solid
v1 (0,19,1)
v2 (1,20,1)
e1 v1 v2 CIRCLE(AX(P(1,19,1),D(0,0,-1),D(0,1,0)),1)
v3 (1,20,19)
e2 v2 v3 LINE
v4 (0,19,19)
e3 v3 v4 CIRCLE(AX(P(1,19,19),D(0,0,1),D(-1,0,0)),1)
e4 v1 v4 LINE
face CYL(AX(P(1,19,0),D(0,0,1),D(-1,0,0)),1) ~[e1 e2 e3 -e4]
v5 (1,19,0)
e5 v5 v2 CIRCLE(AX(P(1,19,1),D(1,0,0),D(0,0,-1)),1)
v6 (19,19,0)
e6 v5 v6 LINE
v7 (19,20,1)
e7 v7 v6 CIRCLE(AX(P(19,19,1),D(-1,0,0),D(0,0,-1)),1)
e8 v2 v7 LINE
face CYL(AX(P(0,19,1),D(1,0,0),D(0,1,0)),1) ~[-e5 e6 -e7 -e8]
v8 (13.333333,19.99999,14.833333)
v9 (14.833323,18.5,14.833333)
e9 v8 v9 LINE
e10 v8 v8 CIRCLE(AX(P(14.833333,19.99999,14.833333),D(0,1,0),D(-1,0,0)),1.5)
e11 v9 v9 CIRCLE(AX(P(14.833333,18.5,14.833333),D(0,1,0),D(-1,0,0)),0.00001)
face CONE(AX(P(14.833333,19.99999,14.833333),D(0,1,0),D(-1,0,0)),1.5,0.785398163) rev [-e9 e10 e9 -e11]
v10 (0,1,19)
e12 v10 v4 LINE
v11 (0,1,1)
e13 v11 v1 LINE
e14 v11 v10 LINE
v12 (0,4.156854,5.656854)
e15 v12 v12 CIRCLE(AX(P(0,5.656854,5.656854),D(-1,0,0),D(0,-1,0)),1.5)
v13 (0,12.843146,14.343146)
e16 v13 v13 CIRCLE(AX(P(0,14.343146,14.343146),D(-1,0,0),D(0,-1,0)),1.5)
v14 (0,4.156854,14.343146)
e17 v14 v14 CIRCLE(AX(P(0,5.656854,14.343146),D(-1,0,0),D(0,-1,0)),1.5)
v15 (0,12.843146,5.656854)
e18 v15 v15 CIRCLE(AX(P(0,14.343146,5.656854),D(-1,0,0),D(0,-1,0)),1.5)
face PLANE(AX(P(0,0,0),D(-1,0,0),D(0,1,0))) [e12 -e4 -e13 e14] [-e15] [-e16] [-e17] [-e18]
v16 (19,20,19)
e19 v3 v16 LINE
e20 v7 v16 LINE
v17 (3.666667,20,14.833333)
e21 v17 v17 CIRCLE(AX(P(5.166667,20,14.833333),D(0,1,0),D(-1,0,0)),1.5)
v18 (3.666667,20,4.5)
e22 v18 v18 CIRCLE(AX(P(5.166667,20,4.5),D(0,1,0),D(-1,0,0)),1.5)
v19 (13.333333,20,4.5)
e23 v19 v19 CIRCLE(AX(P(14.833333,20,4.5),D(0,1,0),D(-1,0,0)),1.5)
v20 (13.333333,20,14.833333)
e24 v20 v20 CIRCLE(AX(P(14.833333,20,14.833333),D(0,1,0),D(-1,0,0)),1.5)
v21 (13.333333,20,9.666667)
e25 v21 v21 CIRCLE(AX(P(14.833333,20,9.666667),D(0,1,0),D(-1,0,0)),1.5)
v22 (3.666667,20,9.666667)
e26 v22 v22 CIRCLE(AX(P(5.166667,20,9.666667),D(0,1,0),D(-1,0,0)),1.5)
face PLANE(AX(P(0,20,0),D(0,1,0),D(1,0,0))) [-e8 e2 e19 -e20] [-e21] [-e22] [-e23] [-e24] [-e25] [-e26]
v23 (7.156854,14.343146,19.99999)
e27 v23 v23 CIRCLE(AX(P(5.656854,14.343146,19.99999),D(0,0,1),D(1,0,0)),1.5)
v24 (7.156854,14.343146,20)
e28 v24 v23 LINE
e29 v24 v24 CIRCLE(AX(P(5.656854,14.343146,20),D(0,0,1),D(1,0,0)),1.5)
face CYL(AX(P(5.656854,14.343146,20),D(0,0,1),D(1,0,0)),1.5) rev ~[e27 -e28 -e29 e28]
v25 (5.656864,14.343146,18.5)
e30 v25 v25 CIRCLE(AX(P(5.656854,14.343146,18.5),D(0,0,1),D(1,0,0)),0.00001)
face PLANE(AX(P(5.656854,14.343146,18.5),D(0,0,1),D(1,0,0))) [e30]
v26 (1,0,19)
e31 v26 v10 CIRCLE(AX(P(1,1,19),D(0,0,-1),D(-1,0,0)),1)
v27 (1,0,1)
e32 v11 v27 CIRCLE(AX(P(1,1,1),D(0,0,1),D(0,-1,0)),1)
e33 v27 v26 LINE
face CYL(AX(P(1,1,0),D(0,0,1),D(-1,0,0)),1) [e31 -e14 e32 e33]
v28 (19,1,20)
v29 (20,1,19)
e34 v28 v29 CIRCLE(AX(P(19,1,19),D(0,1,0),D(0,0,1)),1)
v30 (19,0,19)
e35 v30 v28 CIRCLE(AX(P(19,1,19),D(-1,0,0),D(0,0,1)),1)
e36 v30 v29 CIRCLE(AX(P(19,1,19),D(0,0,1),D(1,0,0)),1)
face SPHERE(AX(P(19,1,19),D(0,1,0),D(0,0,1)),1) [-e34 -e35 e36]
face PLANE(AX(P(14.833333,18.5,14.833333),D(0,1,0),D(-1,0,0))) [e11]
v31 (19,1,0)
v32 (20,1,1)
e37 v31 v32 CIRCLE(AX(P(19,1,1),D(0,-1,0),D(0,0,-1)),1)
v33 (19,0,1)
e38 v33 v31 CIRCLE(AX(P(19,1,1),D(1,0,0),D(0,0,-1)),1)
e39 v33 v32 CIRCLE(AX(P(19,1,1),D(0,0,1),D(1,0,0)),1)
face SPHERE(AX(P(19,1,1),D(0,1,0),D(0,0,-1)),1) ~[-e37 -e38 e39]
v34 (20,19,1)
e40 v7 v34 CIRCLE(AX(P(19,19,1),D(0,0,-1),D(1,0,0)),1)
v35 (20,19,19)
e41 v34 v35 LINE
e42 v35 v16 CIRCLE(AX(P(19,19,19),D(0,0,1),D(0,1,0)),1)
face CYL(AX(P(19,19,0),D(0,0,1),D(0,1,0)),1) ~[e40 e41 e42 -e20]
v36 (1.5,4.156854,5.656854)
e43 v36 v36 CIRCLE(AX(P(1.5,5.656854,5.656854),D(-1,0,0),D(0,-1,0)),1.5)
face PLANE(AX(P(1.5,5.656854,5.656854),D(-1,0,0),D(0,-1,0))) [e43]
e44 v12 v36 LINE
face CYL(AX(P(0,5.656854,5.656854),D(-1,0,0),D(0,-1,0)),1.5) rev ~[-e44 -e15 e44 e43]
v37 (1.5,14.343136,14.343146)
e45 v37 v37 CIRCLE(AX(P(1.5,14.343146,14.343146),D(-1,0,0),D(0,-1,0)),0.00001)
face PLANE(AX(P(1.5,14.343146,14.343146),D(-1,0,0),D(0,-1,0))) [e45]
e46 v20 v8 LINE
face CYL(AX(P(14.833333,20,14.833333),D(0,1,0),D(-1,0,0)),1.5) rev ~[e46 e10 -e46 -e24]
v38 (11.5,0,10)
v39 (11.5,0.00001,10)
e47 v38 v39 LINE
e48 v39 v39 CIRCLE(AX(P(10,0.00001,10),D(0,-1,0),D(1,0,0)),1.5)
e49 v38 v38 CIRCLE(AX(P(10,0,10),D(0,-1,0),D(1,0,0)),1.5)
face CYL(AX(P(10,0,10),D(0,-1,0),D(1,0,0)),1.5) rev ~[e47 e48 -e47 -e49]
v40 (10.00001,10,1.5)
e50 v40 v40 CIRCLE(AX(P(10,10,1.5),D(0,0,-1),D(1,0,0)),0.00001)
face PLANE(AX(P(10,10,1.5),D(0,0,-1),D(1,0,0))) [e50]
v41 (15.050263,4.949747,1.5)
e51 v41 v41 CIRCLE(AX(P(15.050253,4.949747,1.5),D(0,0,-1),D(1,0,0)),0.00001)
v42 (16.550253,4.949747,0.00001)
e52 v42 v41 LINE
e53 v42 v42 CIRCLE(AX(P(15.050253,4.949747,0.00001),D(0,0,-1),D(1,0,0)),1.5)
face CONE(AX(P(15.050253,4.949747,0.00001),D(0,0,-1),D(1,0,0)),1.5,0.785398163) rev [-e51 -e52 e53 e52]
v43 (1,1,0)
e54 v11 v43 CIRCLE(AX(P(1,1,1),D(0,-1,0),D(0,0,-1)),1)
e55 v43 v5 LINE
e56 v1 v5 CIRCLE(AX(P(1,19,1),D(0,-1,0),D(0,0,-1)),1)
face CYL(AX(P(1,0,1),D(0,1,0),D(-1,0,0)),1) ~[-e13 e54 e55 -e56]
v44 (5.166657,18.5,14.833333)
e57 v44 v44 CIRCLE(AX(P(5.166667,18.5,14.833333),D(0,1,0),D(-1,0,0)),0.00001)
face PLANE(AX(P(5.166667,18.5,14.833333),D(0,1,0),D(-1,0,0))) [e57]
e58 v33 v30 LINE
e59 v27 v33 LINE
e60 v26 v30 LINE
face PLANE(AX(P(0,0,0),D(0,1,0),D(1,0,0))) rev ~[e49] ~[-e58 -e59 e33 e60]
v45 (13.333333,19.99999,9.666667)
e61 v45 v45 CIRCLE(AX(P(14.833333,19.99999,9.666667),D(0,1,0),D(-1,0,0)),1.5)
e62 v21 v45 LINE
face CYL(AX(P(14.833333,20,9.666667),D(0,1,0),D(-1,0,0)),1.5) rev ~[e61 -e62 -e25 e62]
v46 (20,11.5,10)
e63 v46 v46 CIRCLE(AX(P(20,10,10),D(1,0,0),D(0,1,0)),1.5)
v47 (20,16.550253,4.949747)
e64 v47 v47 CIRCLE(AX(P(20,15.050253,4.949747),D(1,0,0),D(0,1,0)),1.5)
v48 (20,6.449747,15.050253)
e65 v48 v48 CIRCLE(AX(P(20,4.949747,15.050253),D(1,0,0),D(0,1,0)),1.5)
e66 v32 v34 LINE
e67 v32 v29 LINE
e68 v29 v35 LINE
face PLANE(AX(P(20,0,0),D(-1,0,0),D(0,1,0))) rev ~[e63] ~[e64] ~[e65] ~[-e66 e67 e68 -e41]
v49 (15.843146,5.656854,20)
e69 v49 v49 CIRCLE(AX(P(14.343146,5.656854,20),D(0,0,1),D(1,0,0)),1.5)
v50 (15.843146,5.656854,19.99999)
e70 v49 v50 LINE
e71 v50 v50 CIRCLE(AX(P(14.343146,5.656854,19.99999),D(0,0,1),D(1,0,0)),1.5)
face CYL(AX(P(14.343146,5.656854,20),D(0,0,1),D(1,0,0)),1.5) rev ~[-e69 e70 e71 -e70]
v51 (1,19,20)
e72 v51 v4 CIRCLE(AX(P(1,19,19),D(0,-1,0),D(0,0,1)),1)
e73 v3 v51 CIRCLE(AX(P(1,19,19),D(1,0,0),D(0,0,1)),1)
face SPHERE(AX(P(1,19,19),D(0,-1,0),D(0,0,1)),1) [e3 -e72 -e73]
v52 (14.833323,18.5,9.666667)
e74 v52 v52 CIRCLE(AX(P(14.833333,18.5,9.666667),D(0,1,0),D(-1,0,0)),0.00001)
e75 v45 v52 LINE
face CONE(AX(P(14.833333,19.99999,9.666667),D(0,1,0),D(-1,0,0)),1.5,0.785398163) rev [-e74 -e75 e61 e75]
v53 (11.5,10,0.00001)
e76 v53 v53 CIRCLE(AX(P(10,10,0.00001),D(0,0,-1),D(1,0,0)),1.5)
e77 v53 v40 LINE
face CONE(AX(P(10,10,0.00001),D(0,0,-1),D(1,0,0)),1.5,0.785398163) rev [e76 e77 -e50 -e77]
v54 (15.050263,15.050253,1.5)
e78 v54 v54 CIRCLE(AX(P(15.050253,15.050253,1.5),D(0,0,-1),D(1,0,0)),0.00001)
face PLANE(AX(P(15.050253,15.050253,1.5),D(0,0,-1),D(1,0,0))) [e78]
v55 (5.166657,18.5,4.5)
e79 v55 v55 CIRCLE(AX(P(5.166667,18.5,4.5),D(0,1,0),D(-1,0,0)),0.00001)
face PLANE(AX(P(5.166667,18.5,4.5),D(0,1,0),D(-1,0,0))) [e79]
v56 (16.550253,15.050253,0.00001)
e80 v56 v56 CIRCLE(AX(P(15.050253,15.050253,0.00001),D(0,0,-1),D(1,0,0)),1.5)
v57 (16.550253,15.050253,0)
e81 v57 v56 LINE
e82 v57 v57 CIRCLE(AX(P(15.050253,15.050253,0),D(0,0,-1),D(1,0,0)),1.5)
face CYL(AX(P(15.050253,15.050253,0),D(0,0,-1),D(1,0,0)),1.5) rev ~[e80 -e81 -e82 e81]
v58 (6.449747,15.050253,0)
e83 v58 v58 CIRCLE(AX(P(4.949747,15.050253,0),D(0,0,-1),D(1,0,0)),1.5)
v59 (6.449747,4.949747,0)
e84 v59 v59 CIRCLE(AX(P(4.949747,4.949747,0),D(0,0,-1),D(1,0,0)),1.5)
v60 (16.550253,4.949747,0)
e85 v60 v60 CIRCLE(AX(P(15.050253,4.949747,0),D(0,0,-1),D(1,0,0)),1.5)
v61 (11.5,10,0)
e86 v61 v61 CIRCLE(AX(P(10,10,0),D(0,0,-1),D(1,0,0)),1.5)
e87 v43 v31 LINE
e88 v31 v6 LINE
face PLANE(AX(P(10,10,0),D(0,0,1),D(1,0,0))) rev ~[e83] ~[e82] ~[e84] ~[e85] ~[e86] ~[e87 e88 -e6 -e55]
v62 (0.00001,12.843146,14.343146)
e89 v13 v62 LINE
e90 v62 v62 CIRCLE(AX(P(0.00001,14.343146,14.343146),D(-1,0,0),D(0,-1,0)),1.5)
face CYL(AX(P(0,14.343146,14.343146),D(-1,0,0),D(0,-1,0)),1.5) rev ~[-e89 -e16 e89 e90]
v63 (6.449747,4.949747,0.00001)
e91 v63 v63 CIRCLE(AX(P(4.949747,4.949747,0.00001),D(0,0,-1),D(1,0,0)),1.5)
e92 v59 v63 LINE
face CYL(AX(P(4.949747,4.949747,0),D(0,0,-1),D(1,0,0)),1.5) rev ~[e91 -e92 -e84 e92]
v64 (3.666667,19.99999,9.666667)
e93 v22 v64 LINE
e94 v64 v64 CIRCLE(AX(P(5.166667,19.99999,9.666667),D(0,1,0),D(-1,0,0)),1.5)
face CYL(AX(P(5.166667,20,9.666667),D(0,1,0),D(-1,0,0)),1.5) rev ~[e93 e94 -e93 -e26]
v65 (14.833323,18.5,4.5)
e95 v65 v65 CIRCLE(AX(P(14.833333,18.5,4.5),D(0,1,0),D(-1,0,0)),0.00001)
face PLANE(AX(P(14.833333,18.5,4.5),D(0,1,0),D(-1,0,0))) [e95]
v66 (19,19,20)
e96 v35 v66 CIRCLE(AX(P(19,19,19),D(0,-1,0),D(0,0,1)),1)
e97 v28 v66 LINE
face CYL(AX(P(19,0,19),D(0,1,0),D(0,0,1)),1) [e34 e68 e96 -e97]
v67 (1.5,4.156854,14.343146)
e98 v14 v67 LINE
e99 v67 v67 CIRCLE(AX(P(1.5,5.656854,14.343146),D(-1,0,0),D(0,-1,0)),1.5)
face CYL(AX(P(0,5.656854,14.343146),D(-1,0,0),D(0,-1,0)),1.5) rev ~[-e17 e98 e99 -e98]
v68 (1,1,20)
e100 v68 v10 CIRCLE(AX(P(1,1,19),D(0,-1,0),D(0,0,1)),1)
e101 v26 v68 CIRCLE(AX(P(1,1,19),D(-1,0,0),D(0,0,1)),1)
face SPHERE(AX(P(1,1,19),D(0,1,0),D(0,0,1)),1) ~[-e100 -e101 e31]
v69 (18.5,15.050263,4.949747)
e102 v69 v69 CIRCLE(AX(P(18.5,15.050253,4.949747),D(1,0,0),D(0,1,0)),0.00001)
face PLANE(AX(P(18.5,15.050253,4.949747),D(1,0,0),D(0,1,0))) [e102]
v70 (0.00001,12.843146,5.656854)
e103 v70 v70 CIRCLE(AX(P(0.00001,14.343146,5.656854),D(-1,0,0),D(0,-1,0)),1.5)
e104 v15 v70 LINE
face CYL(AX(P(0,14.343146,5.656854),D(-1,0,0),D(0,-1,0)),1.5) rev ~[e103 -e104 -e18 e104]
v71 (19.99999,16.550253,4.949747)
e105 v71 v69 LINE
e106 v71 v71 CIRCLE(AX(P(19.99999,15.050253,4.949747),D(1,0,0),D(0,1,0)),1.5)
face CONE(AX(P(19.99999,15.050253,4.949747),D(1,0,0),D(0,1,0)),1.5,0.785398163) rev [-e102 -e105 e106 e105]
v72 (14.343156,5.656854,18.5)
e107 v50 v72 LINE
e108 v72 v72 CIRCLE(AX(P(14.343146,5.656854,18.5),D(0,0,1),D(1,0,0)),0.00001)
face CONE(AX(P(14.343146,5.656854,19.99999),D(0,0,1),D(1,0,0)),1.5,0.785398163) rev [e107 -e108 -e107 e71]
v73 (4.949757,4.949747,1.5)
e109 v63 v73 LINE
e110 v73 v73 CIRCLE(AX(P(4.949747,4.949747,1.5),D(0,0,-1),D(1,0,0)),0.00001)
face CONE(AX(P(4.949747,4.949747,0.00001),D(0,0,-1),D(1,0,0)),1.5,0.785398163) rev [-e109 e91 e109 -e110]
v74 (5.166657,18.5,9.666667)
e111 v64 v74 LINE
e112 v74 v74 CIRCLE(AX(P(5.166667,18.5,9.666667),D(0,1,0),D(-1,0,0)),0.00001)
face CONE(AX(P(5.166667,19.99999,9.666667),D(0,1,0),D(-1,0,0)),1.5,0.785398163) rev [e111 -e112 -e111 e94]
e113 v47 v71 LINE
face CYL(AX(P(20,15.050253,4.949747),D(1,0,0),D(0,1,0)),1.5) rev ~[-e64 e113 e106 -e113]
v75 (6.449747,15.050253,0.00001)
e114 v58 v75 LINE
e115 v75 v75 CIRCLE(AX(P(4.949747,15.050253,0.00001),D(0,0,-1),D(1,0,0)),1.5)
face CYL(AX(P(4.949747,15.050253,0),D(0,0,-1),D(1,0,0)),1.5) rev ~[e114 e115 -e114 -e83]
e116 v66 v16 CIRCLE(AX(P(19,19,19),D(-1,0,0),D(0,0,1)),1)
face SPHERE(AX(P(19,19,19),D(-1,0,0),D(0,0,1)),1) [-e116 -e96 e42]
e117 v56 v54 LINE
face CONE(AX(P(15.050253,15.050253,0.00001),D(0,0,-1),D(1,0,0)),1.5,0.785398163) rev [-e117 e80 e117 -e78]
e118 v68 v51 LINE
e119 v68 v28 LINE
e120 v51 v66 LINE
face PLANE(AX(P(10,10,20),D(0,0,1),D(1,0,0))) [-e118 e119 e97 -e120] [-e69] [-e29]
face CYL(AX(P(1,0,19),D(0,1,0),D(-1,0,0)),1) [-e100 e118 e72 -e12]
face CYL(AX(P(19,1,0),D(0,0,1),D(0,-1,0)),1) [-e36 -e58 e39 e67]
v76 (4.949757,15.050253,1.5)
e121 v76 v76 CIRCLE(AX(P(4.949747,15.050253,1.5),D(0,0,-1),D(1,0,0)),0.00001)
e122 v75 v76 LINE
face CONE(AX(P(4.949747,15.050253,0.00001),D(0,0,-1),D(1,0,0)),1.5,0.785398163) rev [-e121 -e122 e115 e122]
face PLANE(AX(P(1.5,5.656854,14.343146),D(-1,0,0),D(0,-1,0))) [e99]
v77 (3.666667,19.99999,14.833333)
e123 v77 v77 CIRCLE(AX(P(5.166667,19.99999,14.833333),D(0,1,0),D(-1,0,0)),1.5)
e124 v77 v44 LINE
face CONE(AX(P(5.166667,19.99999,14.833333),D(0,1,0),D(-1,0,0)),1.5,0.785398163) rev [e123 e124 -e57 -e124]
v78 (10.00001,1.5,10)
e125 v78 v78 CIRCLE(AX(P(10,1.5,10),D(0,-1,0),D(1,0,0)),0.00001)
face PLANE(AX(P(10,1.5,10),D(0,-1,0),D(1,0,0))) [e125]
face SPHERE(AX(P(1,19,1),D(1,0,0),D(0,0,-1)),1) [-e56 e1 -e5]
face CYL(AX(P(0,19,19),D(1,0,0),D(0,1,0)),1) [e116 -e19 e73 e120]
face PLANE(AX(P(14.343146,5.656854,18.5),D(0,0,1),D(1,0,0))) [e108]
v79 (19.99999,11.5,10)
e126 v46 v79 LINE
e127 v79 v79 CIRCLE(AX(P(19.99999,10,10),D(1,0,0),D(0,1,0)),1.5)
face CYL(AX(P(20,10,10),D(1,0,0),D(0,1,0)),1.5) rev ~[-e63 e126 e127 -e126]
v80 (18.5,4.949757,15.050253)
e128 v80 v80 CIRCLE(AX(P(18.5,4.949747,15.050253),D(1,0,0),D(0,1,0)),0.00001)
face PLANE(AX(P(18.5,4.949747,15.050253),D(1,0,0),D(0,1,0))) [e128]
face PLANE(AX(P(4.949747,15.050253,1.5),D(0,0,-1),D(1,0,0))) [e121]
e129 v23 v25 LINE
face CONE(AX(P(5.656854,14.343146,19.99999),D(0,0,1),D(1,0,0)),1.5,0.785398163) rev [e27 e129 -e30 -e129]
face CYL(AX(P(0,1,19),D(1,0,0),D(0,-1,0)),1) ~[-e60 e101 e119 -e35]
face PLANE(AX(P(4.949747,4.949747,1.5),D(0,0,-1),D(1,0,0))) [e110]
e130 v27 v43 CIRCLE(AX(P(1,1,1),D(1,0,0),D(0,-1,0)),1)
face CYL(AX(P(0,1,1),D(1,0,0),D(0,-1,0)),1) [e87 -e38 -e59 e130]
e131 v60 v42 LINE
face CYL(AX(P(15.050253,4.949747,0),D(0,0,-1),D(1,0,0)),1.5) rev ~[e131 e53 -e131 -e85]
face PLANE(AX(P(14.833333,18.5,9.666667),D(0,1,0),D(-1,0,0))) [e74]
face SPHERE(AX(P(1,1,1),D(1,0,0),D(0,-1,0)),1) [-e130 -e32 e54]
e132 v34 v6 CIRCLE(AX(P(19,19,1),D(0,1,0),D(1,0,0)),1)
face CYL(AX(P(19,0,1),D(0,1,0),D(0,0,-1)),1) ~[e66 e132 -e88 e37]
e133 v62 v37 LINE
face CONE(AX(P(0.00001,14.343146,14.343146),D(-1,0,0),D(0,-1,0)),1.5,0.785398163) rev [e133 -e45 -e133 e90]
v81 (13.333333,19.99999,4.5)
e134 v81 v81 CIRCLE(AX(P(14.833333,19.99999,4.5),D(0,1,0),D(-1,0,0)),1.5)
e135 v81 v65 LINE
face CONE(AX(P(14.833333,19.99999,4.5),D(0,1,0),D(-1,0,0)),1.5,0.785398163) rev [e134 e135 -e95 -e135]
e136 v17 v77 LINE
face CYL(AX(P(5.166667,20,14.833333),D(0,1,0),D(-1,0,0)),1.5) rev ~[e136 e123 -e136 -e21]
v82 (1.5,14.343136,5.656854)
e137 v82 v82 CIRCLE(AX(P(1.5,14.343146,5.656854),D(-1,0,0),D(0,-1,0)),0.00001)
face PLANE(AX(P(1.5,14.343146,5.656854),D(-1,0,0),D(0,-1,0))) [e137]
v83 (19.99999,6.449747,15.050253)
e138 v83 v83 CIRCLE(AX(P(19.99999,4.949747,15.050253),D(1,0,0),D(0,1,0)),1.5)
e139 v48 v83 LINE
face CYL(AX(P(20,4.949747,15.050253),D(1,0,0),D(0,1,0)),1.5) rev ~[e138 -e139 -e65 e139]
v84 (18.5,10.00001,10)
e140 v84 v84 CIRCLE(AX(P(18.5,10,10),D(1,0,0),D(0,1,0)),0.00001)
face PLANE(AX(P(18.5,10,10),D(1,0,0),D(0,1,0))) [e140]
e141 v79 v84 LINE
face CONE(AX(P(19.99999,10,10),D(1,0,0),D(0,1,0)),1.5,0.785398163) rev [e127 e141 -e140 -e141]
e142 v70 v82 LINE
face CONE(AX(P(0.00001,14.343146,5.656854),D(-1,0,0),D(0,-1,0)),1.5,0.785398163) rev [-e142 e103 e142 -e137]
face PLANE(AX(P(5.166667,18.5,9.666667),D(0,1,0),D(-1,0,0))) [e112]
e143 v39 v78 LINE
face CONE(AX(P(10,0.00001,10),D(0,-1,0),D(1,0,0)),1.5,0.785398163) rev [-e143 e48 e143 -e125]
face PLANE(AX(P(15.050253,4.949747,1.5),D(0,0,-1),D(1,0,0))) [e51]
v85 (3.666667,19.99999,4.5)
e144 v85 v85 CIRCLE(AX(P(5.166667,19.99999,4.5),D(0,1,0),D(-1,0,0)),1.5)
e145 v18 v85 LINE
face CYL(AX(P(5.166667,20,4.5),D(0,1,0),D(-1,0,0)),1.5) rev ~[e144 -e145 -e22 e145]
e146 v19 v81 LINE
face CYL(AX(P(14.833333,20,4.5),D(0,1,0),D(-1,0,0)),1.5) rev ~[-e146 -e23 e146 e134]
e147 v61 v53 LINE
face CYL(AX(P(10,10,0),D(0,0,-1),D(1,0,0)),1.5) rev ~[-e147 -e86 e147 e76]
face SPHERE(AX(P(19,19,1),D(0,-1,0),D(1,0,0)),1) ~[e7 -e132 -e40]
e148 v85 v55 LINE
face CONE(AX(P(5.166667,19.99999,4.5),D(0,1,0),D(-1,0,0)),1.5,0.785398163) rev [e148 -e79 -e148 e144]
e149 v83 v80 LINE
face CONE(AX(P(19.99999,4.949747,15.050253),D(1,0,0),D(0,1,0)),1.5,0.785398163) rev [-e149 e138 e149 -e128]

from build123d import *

# Parameters (mm, degrees)
F0_W      = 20
F0_H      = 20
F1_DEPTH  = 20
F2_R      = 1.5
F3_DEPTH  = 1.5
F4_R      = 1.5
F5_DEPTH  = 1.5
F6_R      = 1
F7_SIZE   = 1.49999
F8_R      = 1.5
F9_DEPTH  = 1.5
F10_SIZE  = 1.49999
F11_R     = 1.5
F12_DEPTH = 1.5
F13_SIZE  = 1.49999
F14_R     = 1.5
F15_DEPTH = 1.5
F16_SIZE  = 1.49999
F17_R     = 1.5
F18_DEPTH = 1.5
F19_SIZE  = 1.49999


# Not quite as in the source:
# - a fillet or chamfer is up to 0.001 mm smaller than in the source, because OpenCascade refuses the exact size


with BuildPart() as f1:
    # F0 (on Top) → F1 (new body)
    with BuildSketch(Plane.XY):
        with Locations((10, 10)):
            Rectangle(F0_W, F0_H)
    extrude(amount=F1_DEPTH)

    # F2 (on face) → F3 (cut)
    with BuildSketch(Plane.XZ):
        with Locations((10, 10)):
            Circle(F2_R)
    extrude(amount=-F3_DEPTH, mode=Mode.SUBTRACT)

    # F4 (on face) → F5 (cut)
    with BuildSketch(Plane.XY.offset(20)):
        with Locations((14.3431457505, 5.6568542495)):
            Circle(F4_R)
        with Locations((5.6568542495, 14.3431457505)):
            Circle(F4_R)
    extrude(amount=-F5_DEPTH, mode=Mode.SUBTRACT)

    # F6
    f6_edges = [f1.edges().sort_by_distance(p)[0] for p in [
        (0, 10, 20),
        (10, 20, 20),
        (20, 10, 20),
        (20, 10, 0),
        (10, 0, 20),
        (10, 0, 0),
        (0, 0, 10),
        (20, 0, 10),
        (20, 20, 10),
        (10, 20, 0),
        (0, 10, 0),
        (0, 20, 10),
    ]]
    fillet(f6_edges, radius=F6_R)

    # F7 (size 1.5 in the source; OpenCascade refuses exactly that, so slightly less here)
    f7_edges = [f1.edges().sort_by_distance(p)[0] for p in [
        (12.843146, 5.656854, 18.5),
        (4.156854, 14.343146, 18.5),
        (8.5, 1.5, 10),
    ]]
    chamfer(f7_edges, length=F7_SIZE)

    # F8 (on face) → F9 (cut)
    with BuildSketch(Plane.YZ.offset(20)):
        with Locations((15.0502525317, 4.9497474683)):
            Circle(F8_R)
        with Locations((4.9497474683, 15.0502525317)):
            Circle(F8_R)
        with Locations((10, 10)):
            Circle(F8_R)
    extrude(amount=-F9_DEPTH, mode=Mode.SUBTRACT)

    # F10 (size 1.5 in the source; OpenCascade refuses exactly that, so slightly less here)
    f10_edges = [f1.edges().sort_by_distance(p)[0] for p in [
        (18.5, 3.449747, 15.050253),
        (18.5, 8.5, 10),
        (18.5, 13.550253, 4.949747),
    ]]
    chamfer(f10_edges, length=F10_SIZE)

    # F11 (on face) → F12 (cut)
    with BuildSketch(Plane(origin=(0, 0, 0), x_dir=(0, -1, 0), z_dir=(-1, 0, 0))):
        with Locations((-14.3431457505, 14.3431457505)):
            Circle(F11_R)
        with Locations((-14.3431457505, 5.6568542495)):
            Circle(F11_R)
        with Locations((-5.6568542495, 14.3431457505)):
            Circle(F11_R)
        with Locations((-5.6568542495, 5.6568542495)):
            Circle(F11_R)
    extrude(amount=-F12_DEPTH, mode=Mode.SUBTRACT)

    # F13 (size 1.5 in the source; OpenCascade refuses exactly that, so slightly less here)
    f13_edges = [f1.edges().sort_by_distance(p)[0] for p in [
        (1.5, 15.843146, 14.343146),
        (1.5, 15.843146, 5.656854),
    ]]
    chamfer(f13_edges, length=F13_SIZE)

    # F14 (on face) → F15 (cut)
    with BuildSketch(Plane(origin=(0, 0, 0), x_dir=(1, 0, 0), z_dir=(0, 0, -1))):
        with Locations((4.9497474683, -15.0502525317)):
            Circle(F14_R)
        with Locations((15.0502525317, -15.0502525317)):
            Circle(F14_R)
        with Locations((15.0502525317, -4.9497474683)):
            Circle(F14_R)
        with Locations((4.9497474683, -4.9497474683)):
            Circle(F14_R)
        with Locations((10, -10)):
            Circle(F14_R)
    extrude(amount=-F15_DEPTH, mode=Mode.SUBTRACT)

    # F16 (size 1.5 in the source; OpenCascade refuses exactly that, so slightly less here)
    f16_edges = [f1.edges().sort_by_distance(p)[0] for p in [
        (3.449747, 4.949747, 1.5),
        (13.550253, 4.949747, 1.5),
        (8.5, 10, 1.5),
        (3.449747, 15.050253, 1.5),
        (13.550253, 15.050253, 1.5),
    ]]
    chamfer(f16_edges, length=F16_SIZE)

    # F17 (on face) → F18 (cut)
    with BuildSketch(Plane(origin=(0, 20, 0), x_dir=(-1, 0, 0), z_dir=(0, 1, 0))):
        with Locations((-5.1666666667, 9.6666666667)):
            Circle(F17_R)
        with Locations((-5.1666666667, 14.8333333333)):
            Circle(F17_R)
        with Locations((-14.8333333333, 4.5)):
            Circle(F17_R)
        with Locations((-5.1666666667, 4.5)):
            Circle(F17_R)
        with Locations((-14.8333333333, 14.8333333333)):
            Circle(F17_R)
        with Locations((-14.8333333333, 9.6666666667)):
            Circle(F17_R)
    extrude(amount=-F18_DEPTH, mode=Mode.SUBTRACT)

    # F19 (size 1.5 in the source; OpenCascade refuses exactly that, so slightly less here)
    f19_edges = [f1.edges().sort_by_distance(p)[0] for p in [
        (16.333333, 18.5, 14.833333),
        (6.666667, 18.5, 14.833333),
        (6.666667, 18.5, 9.666667),
        (6.666667, 18.5, 4.5),
        (16.333333, 18.5, 4.5),
        (16.333333, 18.5, 9.666667),
    ]]
    chamfer(f19_edges, length=F19_SIZE)


solid = f1.part
